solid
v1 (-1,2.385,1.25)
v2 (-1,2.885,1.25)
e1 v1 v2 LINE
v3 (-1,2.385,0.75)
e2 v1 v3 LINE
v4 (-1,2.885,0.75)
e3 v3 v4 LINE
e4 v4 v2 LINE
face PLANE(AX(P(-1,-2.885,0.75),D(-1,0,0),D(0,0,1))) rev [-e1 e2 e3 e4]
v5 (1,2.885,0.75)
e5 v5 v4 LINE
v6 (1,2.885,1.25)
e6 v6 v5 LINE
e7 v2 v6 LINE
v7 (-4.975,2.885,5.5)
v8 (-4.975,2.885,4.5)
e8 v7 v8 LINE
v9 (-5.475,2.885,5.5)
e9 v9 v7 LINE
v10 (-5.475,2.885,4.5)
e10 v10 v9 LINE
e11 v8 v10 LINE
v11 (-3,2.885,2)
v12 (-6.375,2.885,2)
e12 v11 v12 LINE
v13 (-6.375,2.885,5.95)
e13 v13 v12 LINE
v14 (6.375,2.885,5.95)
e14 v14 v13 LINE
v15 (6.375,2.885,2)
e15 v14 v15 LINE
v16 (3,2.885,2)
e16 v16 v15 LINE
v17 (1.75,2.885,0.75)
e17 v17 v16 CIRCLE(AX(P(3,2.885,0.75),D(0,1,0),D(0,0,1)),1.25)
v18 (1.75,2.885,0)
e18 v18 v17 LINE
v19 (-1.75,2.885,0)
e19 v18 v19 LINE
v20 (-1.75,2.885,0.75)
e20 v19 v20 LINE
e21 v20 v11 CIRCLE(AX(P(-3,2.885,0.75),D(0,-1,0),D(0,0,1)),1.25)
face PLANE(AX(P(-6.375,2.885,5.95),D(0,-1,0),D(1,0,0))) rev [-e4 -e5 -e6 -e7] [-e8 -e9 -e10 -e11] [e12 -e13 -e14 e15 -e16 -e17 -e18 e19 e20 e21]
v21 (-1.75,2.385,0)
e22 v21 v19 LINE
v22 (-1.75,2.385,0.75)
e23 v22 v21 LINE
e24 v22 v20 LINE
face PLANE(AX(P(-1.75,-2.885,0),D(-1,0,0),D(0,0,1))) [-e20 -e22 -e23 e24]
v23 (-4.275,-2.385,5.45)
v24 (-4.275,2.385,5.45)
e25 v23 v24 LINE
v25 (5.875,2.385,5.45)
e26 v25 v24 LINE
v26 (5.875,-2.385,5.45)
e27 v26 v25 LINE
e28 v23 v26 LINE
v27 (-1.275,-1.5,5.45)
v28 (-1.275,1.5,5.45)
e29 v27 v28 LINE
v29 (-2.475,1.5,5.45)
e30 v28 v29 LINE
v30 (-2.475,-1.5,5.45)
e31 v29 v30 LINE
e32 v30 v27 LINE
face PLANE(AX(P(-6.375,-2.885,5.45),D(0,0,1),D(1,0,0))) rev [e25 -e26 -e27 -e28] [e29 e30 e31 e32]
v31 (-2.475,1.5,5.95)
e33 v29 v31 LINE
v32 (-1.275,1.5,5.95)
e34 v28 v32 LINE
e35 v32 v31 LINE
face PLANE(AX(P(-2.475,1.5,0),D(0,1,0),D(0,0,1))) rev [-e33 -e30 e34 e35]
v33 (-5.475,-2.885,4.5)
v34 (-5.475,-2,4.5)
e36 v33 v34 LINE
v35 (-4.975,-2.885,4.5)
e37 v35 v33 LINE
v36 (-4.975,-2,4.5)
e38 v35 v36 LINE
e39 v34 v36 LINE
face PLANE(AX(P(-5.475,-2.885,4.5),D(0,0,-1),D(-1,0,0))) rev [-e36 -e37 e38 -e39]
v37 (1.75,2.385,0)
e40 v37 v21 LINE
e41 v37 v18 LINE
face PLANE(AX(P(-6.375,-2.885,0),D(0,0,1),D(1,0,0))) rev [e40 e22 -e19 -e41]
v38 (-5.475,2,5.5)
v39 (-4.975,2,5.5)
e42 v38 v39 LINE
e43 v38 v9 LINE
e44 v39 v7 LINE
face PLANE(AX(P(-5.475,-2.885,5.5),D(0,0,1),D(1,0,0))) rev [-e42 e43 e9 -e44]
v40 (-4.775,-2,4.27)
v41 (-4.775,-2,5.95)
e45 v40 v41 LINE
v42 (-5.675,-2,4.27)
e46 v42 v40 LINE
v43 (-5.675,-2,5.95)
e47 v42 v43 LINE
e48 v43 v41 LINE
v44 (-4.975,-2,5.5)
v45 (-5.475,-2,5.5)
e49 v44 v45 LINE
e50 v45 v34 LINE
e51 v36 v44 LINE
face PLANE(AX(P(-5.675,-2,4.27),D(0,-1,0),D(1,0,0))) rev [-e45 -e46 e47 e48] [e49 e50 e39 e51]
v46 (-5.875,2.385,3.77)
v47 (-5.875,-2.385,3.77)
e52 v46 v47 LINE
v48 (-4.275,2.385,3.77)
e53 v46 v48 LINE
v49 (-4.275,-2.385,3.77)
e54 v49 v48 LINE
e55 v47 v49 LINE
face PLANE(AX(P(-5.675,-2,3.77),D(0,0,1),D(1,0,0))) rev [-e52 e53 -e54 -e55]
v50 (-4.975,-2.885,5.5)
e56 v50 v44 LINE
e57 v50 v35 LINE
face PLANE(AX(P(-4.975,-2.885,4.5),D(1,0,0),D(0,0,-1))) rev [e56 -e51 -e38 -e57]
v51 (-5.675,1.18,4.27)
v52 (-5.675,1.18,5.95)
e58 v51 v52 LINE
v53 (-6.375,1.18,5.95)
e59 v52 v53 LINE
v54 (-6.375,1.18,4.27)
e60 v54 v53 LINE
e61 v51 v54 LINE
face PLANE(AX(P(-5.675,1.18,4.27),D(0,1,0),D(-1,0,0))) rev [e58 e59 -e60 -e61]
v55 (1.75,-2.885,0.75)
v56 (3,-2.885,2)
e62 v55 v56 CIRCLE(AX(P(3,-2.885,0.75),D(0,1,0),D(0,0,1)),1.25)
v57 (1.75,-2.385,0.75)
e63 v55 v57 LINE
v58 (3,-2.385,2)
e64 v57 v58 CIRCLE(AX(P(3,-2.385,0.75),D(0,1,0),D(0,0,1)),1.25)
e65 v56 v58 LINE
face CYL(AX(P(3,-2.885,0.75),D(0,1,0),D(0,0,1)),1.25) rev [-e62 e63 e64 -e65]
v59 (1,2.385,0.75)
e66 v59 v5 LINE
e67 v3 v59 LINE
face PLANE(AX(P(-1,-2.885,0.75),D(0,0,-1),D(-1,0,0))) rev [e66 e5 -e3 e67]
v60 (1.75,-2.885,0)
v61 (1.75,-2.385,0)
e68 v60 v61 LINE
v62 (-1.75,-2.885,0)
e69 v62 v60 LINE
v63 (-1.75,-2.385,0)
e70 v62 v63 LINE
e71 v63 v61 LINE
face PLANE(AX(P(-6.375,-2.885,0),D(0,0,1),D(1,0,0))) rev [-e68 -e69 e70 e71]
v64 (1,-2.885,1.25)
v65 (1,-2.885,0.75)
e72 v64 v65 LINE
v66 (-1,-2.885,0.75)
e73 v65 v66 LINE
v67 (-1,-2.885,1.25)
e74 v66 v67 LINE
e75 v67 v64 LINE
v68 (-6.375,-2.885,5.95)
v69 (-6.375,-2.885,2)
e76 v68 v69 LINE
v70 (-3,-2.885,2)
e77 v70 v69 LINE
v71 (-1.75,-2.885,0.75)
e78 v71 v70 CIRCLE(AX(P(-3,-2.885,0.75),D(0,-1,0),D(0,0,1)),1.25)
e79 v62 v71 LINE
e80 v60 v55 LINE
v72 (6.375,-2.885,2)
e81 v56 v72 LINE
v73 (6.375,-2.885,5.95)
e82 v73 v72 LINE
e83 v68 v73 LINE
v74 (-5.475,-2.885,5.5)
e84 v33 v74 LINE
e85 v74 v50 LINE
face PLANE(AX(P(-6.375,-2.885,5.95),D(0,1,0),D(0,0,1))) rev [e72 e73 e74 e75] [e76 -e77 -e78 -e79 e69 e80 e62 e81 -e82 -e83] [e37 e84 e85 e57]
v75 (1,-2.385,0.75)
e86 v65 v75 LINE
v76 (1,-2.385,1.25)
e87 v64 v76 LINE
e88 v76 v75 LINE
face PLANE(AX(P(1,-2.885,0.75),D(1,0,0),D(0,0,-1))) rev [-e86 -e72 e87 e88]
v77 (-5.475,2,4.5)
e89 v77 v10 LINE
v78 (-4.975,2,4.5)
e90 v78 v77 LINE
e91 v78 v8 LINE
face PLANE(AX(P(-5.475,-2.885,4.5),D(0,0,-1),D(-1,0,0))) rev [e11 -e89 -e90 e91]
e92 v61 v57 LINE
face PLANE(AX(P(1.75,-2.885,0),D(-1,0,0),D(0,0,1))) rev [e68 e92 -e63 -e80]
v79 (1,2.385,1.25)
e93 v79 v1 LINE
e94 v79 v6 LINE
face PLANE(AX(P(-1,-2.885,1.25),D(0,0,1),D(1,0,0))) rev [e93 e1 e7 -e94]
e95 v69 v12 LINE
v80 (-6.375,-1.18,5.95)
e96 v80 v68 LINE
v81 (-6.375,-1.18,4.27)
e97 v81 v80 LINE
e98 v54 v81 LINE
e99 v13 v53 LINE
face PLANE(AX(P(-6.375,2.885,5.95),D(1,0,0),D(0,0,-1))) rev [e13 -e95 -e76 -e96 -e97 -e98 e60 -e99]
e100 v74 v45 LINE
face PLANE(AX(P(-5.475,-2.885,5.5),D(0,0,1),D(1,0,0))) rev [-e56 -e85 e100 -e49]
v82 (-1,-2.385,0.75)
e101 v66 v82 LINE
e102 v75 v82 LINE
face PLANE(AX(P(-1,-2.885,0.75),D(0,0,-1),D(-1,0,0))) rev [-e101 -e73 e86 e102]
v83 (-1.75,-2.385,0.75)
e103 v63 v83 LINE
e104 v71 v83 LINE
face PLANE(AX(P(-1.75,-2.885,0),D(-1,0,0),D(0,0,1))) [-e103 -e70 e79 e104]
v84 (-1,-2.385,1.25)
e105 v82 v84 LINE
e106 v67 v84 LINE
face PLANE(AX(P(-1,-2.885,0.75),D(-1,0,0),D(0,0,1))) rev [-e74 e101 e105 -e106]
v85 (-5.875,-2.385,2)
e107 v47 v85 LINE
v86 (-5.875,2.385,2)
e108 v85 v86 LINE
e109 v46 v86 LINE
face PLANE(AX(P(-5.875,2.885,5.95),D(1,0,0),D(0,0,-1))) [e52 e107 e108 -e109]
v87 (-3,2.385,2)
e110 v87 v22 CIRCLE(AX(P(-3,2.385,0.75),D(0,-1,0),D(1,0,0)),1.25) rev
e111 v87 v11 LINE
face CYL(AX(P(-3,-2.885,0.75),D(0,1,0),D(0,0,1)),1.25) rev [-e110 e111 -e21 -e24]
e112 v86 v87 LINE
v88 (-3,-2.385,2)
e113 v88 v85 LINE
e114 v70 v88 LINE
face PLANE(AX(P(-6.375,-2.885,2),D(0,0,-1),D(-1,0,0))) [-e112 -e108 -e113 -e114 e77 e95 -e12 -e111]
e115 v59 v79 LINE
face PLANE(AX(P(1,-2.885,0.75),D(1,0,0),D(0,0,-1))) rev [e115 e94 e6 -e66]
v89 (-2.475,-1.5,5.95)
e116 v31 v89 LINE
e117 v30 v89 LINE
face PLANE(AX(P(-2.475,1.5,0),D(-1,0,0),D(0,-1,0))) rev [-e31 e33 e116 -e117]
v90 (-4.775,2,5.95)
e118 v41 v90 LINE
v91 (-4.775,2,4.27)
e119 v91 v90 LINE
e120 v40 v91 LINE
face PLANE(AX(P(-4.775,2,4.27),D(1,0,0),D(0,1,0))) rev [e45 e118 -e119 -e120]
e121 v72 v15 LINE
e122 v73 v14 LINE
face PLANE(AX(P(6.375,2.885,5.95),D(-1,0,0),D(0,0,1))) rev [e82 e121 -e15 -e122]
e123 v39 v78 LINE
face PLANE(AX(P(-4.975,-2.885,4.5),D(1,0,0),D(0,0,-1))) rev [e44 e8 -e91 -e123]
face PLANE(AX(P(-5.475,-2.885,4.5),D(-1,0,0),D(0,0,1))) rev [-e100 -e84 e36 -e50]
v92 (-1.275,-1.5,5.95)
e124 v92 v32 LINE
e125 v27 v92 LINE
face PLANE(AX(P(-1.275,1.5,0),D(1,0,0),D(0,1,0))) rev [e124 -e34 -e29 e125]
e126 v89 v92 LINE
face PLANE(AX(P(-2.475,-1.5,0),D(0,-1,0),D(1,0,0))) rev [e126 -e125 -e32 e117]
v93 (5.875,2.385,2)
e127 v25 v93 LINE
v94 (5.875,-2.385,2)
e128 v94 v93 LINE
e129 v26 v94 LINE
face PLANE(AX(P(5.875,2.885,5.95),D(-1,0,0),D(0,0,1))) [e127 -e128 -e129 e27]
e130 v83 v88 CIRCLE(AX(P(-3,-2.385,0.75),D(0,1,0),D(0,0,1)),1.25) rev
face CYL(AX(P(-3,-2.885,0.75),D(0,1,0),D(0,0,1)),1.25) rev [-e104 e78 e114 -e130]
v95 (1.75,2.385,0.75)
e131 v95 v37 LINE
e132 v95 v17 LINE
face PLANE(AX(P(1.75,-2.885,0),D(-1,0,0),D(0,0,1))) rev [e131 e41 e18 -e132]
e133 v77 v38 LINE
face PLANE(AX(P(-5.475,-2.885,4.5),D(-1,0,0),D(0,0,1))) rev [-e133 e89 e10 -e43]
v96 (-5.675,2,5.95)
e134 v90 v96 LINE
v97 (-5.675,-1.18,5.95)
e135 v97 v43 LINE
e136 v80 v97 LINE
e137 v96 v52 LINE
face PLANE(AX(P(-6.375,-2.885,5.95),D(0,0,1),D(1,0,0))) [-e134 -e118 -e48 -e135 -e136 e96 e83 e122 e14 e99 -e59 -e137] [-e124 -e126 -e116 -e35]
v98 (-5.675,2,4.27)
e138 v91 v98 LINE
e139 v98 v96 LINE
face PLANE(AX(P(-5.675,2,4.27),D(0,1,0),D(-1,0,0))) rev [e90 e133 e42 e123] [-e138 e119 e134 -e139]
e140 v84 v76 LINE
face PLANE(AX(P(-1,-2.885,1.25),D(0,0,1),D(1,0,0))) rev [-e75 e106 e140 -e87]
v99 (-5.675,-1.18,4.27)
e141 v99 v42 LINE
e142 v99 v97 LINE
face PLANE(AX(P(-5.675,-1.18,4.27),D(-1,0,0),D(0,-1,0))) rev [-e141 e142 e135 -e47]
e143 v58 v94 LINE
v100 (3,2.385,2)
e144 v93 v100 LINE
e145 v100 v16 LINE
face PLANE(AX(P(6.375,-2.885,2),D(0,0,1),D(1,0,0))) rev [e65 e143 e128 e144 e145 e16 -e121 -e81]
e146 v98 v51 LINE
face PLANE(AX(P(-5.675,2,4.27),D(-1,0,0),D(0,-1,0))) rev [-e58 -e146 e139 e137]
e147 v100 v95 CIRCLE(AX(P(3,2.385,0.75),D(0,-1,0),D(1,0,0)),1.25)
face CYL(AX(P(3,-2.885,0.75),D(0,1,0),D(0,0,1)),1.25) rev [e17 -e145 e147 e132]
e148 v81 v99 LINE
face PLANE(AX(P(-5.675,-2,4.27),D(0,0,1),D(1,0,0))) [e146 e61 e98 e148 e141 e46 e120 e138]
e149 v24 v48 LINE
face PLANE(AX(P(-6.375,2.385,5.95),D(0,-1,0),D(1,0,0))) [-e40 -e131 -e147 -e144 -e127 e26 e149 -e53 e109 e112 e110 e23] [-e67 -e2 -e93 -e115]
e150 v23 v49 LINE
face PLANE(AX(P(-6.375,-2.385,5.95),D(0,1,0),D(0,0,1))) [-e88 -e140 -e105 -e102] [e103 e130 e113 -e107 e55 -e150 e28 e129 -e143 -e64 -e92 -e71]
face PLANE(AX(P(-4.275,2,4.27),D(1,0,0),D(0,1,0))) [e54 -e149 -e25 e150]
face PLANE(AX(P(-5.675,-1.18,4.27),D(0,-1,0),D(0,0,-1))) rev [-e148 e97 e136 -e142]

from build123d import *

# Parameters (mm, degrees)
ESQUISSE1_W                  = 12.75
ESQUISSE1_H                  = 5.77
BASE_EXTRUSION_DEPTH         = 5.95
ENL_V_MAT_EXTRU_1_DEPTH      = 1.68
COQUE1_OUTLINE_W             = 10.15
COQUE1_OUTLINE_H             = 4.77
COQUE1_DEPTH                 = 5.45
COQUE1_2_OUTLINE_W           = 1.6
COQUE1_2_OUTLINE_H           = 4.77
COQUE1_2_DEPTH               = 3.77
ENL_V_MAT_EXTRU_2_DEPTH      = 10.185115677
ENL_V_MAT_EXTRU_3_DEPTH      = 10.185115677
ENL_V_MAT_EXTRU_3_DEPTH_BACK = 10.185115677
ESQUISSE4_W                  = 2
ESQUISSE4_H                  = 0.5
ESQUISSE4_W_2                = 0.5
ESQUISSE4_H_2                = 1
ESQUISSE5_W                  = 1.2
ESQUISSE5_H                  = 3
ENL_V_MAT_EXTRU_4_DEPTH      = 10.185115677


# Read off the part's stored shape, not the designer's step: Coque1
with BuildPart() as part:
    # Esquisse1 → Base-Extrusion (new body)
    with BuildSketch(Plane.XY):
        Rectangle(ESQUISSE1_W, ESQUISSE1_H)
    extrude(amount=BASE_EXTRUSION_DEPTH)

    # Esquisse2 → Enlèv. mat.-Extru.1 (cut)
    with BuildSketch(Plane.XY.offset(5.95)):
        Polygon((-5.675, 2), (-4.775, 2), (-4.775, -2), (-5.675, -2), (-5.675, -1.18), (-6.375, -1.18), (-6.375, 1.18), (-5.675, 1.18), align=None)
    extrude(amount=-ENL_V_MAT_EXTRU_1_DEPTH, mode=Mode.SUBTRACT)

    # Coque1 outline → Coque1 (cut)
    with BuildSketch(Plane.XY):
        with Locations((0.8, 0)):
            Rectangle(COQUE1_OUTLINE_W, COQUE1_OUTLINE_H)
    extrude(amount=COQUE1_DEPTH, mode=Mode.SUBTRACT)

    # Coque1 2 outline → Coque1 2 (cut)
    with BuildSketch(Plane.XY):
        with Locations((-5.075, 0)):
            Rectangle(COQUE1_2_OUTLINE_W, COQUE1_2_OUTLINE_H)
    extrude(amount=COQUE1_2_DEPTH, mode=Mode.SUBTRACT)

    # Esquisse3 → Enlèv. mat.-Extru.2 (cut, symmetric)
    with BuildSketch(Plane(origin=(0, 0, 0), x_dir=(1, 0, 0), z_dir=(0, 1, 0))):
        with BuildLine():
            Line((6.375, -2), (3, -2))
            ThreePointArc((3, -2), (2.116116524, -1.633883476), (1.75, -0.75))
            Line((1.75, -0.75), (1.75, 0))
            Line((1.75, 0), (6.375, 0))
            Line((6.375, 0), (6.375, -2))
        make_face()
    enl_v_mat_extru_2 = extrude(amount=ENL_V_MAT_EXTRU_2_DEPTH, both=True, mode=Mode.SUBTRACT)

    # Symétrie1: Enlèv. mat.-Extru.2 across plane
    add(enl_v_mat_extru_2.mirror(Plane(origin=(0, 0, 0), x_dir=(0, 0, 1), z_dir=(1, 0, 0))), mode=Mode.SUBTRACT)

    # Esquisse4 → Enlèv. mat.-Extru.3 (cut, two sides: drawn at the far end of the back side and taken through both)
    with BuildSketch(Plane(origin=(0, 0, 0), x_dir=(1, 0, 0), z_dir=(0, 1, 0)).offset(-ENL_V_MAT_EXTRU_3_DEPTH_BACK)):
        with Locations((0, -1)):
            Rectangle(ESQUISSE4_W, ESQUISSE4_H)
        with Locations((-5.225, -5)):
            Rectangle(ESQUISSE4_W_2, ESQUISSE4_H_2)
    extrude(amount=ENL_V_MAT_EXTRU_3_DEPTH + ENL_V_MAT_EXTRU_3_DEPTH_BACK, mode=Mode.SUBTRACT)

    # Esquisse5 → Enlèv. mat.-Extru.4 (cut, through all)
    with BuildSketch(Plane.XY.offset(5.95)):
        with Locations((-1.875, 0)):
            Rectangle(ESQUISSE5_W, ESQUISSE5_H)
    extrude(amount=-ENL_V_MAT_EXTRU_4_DEPTH, mode=Mode.SUBTRACT)


solid = part.part
